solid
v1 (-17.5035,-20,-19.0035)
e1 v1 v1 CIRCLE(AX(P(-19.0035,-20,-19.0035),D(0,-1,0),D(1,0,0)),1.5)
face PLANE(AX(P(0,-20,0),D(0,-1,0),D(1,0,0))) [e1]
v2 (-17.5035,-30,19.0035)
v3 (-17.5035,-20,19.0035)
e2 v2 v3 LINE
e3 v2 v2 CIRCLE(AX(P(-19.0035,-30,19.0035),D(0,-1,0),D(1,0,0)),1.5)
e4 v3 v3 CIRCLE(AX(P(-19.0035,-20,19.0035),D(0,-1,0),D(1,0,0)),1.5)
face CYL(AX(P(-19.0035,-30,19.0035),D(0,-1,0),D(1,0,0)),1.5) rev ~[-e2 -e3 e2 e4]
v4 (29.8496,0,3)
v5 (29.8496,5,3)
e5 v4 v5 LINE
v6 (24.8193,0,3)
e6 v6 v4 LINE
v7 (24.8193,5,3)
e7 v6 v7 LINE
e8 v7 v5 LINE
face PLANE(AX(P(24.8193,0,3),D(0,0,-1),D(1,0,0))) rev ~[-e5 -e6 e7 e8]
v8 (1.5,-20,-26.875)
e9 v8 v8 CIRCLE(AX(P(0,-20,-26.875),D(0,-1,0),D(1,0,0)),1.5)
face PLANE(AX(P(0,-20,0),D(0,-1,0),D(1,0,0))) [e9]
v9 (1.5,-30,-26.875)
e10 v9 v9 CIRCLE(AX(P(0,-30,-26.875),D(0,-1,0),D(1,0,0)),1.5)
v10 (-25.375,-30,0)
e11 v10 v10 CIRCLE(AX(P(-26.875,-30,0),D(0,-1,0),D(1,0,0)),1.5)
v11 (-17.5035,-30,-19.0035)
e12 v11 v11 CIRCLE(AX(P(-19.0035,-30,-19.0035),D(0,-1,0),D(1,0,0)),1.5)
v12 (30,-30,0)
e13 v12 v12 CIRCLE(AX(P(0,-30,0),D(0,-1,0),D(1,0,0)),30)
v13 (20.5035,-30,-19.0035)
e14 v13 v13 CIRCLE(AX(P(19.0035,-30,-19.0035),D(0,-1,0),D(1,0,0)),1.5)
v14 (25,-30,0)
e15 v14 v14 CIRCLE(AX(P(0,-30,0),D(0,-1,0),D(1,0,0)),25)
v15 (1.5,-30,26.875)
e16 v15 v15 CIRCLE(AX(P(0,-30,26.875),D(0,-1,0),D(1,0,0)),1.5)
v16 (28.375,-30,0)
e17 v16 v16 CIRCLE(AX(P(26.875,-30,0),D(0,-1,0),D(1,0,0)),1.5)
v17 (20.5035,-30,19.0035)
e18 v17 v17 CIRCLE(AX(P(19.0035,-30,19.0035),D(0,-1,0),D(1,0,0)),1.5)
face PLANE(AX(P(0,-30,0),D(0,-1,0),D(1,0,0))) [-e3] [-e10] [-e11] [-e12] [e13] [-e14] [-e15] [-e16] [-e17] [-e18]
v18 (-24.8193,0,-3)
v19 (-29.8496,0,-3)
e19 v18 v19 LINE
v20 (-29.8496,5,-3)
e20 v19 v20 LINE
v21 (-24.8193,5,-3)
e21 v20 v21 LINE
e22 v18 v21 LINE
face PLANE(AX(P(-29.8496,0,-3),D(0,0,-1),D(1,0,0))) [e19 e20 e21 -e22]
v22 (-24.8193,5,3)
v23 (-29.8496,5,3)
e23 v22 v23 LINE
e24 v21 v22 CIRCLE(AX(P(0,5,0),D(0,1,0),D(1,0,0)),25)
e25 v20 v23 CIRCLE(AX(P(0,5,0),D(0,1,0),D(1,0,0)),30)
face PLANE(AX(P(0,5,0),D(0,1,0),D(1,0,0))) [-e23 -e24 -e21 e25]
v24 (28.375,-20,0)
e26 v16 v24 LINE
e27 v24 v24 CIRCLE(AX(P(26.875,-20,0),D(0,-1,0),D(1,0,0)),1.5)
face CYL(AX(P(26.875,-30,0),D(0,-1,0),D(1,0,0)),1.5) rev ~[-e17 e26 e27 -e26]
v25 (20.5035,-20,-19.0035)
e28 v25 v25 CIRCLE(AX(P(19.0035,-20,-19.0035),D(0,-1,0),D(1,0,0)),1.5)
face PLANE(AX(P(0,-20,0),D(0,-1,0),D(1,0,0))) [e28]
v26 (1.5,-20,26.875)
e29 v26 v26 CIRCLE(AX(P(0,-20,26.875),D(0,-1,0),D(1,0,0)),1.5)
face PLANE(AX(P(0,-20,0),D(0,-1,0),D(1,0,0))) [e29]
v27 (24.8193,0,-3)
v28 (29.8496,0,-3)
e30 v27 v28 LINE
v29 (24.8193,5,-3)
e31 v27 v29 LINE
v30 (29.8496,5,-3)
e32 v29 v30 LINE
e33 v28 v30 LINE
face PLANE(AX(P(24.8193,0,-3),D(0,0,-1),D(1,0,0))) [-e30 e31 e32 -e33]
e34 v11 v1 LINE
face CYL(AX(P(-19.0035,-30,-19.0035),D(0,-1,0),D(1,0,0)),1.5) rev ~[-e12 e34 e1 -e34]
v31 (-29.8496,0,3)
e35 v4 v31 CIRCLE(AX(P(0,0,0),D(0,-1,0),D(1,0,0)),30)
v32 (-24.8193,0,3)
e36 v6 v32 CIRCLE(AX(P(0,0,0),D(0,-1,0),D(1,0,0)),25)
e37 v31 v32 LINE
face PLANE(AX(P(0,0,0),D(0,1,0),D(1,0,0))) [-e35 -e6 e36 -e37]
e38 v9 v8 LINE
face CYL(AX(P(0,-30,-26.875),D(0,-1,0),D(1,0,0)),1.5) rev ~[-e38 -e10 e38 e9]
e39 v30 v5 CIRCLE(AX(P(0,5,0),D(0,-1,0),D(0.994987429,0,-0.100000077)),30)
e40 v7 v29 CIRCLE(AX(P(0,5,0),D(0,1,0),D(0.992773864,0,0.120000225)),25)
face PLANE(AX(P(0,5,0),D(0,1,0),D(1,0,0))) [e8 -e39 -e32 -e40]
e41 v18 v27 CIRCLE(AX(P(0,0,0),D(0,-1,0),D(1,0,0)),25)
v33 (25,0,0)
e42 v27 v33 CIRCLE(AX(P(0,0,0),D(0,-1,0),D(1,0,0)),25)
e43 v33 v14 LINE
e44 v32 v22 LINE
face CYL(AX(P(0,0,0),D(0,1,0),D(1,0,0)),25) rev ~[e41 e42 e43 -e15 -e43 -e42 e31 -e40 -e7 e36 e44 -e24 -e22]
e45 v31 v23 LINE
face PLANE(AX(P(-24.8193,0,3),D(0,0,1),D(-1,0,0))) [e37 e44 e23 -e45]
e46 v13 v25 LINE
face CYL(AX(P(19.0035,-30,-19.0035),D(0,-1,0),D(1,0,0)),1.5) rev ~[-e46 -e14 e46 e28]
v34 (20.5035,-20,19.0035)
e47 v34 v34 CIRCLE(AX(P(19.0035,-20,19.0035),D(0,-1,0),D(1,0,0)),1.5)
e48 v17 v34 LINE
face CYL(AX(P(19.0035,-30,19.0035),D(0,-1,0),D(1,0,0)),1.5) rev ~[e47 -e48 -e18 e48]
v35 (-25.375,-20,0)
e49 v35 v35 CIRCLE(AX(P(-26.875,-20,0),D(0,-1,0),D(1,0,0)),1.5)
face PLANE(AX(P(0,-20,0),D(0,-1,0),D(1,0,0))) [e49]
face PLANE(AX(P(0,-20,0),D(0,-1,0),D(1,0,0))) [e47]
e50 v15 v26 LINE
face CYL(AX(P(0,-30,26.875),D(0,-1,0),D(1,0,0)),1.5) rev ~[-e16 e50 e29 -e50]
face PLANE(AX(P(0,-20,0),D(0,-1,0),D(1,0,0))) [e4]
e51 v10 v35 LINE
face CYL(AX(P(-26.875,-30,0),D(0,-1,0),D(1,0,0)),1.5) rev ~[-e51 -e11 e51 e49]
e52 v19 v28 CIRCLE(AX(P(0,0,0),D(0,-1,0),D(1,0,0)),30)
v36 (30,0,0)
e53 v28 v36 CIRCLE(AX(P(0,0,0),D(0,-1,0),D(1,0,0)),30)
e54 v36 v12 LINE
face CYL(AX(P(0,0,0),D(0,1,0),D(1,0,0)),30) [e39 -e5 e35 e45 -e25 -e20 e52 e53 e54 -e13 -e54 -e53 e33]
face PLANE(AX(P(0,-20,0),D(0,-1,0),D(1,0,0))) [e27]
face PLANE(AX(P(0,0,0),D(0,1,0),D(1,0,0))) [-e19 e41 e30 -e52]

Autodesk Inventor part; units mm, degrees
ref_plane "YZ Plane" through (0, 0, 0) normal (1, 0, 0) x (0, 1, 0)
ref_plane "XZ Plane" through (0, 0, 0) normal (0, 1, 0) x (-1, 0, 0)
ref_plane "XY Plane" through (0, 0, 0) normal (0, 0, 1) x (1, 0, 0)
sketch "Sketch1" plane through (0, 0, 0) normal (0, 1, 0) x (-1, 0, 0)
  line L0 (0, 0) -> (50, 0) construction
  line L1 (0, 0) -> (50, 0) construction
  line L2 (0, 0) -> (-36, 0)
  circle A0 centre (0, 0) radius 25
  line L3 (-60, -10) -> (-60, 10)
  circle A1 centre (0, 0) radius 61
  point P0 (62.509, -33.0548)
  point P1 (12.6591, 21.558)
  point P2 (24.4148, 5.3777)
  point P3 (24.4148, -5.3777)
  point P4 (-22.9129, 10)
  point P5 (-22.9129, -10)
  point P6 (12.6591, -21.558)
  dimension "d2" = 36
  dimension "d3" = 50
  dimension "d26" = 122
extrude "Extrusion1" add sketch "Sketch1" along normal blind 5 contours A0 | A1
sketch "Sketch2" plane through (0, 5, 0) normal (0, 1, 0) x (1, 0, 0)
  circle A0 centre (0, 0) radius 20
  dimension "d6" = 40
extrude "Extrusion2" cut sketch "Sketch2" against normal up to next
sketch "Sketch3" plane through (0, 5, 0) normal (0, 1, 0) x (1, 0, 0)
  line L0 (22.1416, 4) -> (20.8701, 4)
  line L1 (22.1416, -4) -> (20.8701, -4)
  line L2 (24.6779, 4) -> (22.1416, 4)
  line L3 (24.6779, -4) -> (22.1416, -4)
  line L4 (-15.5618, -16.2506) -> (-14.5332, -15.5032)
  line L5 (-15.5618, 16.2506) -> (-14.5332, 15.5032)
  line L6 (-20.2641, -9.7784) -> (-19.2354, -9.0311)
  line L7 (-17.6137, -17.7414) -> (-15.5618, -16.2506)
  line L8 (-22.316, -11.2693) -> (-20.2641, -9.7784)
  line L9 (-20.2641, 9.7784) -> (-19.2354, 9.0311)
  line L10 (-17.6137, 17.7414) -> (-15.5618, 16.2506)
  line L11 (-22.316, 11.2693) -> (-20.2641, 9.7784)
  line L12 (-23.5374, 22.0452) -> (-13.679, 22.0452) construction
  arc A0 (-17.6137, -17.7414) -> (24.6779, -4) centre (0, 0) ccw
  arc A1 (24.6779, 4) -> (-17.6137, 17.7414) centre (0, 0) ccw
  arc A2 (-22.316, 11.2693) -> (-22.316, -11.2693) centre (0, 0) ccw
  line L13 (20.8701, 4) -> (15.8701, 4)
  line L14 (15.8701, 4) -> (15.8701, -4)
  line L15 (15.8701, -4) -> (20.8701, -4)
  line L16 (-14.5332, 15.5032) -> (-10.4881, 12.5643)
  line L17 (-10.4881, 12.5643) -> (-15.1903, 6.0922)
  line L18 (-15.1903, 6.0922) -> (-19.2354, 9.0311)
  line L19 (-19.2354, -9.0311) -> (-15.1903, -6.0922)
  line L20 (-15.1903, -6.0922) -> (-10.4881, -12.5643)
  line L21 (-10.4881, -12.5643) -> (-14.5332, -15.5032)
  circle A3 centre (-22.5, 0) radius 1.5
  circle A4 centre (0, 22.5) radius 1.5
  circle A5 centre (18.2029, 13.2252) radius 1.5
  circle A6 centre (18.2029, -13.2252) radius 1.5
  circle A7 centre (0, -22.5) radius 1.5
  circle A8 centre (0, 0) radius 4
  line L22 (0, 0) -> (8, 0)
  line L23 (8, 0) -> (8, 7.5)
  line L24 (8, 0) -> (8, -7.5)
  circle A9 centre (8, -7.5) radius 2.5
  circle A10 centre (8, 7.5) radius 2.5
  point P0 (-23.5374, -22.0452)
  point P1 (-28.2397, -15.5731)
  dimension "d9" = 36
  dimension "d10" = 5
  dimension "d11" = 5
  dimension "d12" = 3
  dimension "d13" = 3
  dimension "d14" = 3
  dimension "d15" = 3
  dimension "d16" = 3
  dimension "d17" = 8
  dimension "d18" = 8
  dimension "d19" = 7.5
  dimension "d20" = 7.5
  dimension "d21" = 5
  dimension "d22" = 5
extrude "Extrusion3" cut sketch "Sketch3" against normal up to next contours A3 | A4 | A5 | A6 | A7
sketch "Sketch5" plane through (0, 5, 0) normal (0, 1, 0) x (1, 0, 0)
  line L0 (0, 0) -> (37.5601, 0) construction
  circle A0 centre (0, 0) radius 25
  line L1 (0, 0) -> (15.7675, -27.31)
  line L2 (0, 0) -> (31.5349, 0) construction
  line L3 (0, 0) -> (19.8269, 34.3411)
  line L4 (0, 0) -> (39.6537, 0) construction
  line L5 (12.5, 21.6506) -> (15, 25.9808)
  line L6 (12.5, -21.6506) -> (15, -25.9808)
  line L7 (15, -25.9808) -> (27.9904, -18.4808)
  line L8 (27.9904, -18.4808) -> (34.9904, -30.6051)
  line L9 (34.9904, -30.6051) -> (22, -38.1051)
  line L10 (22, -38.1051) -> (15, -25.9808)
  line L11 (22, -38.1051) -> (15, -25.9808)
  line L12 (15, -25.9808) -> (2.0096, -33.4808)
  line L13 (2.0096, -33.4808) -> (9.0096, -45.6051)
  line L14 (9.0096, -45.6051) -> (22, -38.1051)
  line L15 (15, 25.9808) -> (2.0096, 33.4808)
  line L16 (2.0096, 33.4808) -> (9.0096, 45.6051)
  line L17 (9.0096, 45.6051) -> (22, 38.1051)
  line L18 (22, 38.1051) -> (15, 25.9808)
  line L19 (22, 38.1051) -> (15, 25.9808)
  line L20 (15, 25.9808) -> (27.9904, 18.4808)
  line L21 (27.9904, 18.4808) -> (34.9904, 30.6051)
  line L22 (34.9904, 30.6051) -> (22, 38.1051)
  dimension "d41" = 50
  dimension "d47" = 60
  dimension "d48" = 60
  dimension "d49" = 5
  dimension "d50" = 5
  dimension "d51" = 15
  dimension "d52" = 14
  dimension "d53" = 15
  dimension "d54" = 15
  dimension "d55" = 14
  dimension "d56" = 15
extrude "Extrusion5" cut sketch "Sketch5" against normal up to next contours L7 L8 L9 L10 L1 | L1 L10 L14 L13 L12 | L15 L16 L17 L18 L3 | L3 L18 L22 L21 L20
sketch "Sketch6" plane through (0, 0, 0) normal (0, -1, 0) x (1, 0, 0)
  circle A0 centre (0, 0) radius 25
  circle A1 centre (0, 0) radius 28.75
  circle A2 centre (0, 0) radius 30
  dimension "d57" = 50
  dimension "d58" = 57.5
extrude "Extrusion6" add sketch "Sketch6" along normal blind 30 contours A1 | A2
sketch "Sketch7" plane through (0, -30, 0) normal (0, -1, 0) x (1, 0, 0)
  circle A0 centre (26.875, 0) radius 1.5
  circle A1 centre (0, -26.875) radius 1.5
  circle A2 centre (-26.875, 0) radius 1.5
  circle A3 centre (0, 26.875) radius 1.5
  circle A4 centre (19.0035, 19.0035) radius 1.5
  circle A5 centre (19.0035, -19.0035) radius 1.5
  circle A6 centre (-19.0035, -19.0035) radius 1.5
  circle A7 centre (-19.0035, 19.0035) radius 1.5
  dimension "d62" = 3
  dimension "d63" = 3
  dimension "d64" = 3
  dimension "d65" = 3
  dimension "d67" = 3
  dimension "d68" = 3
  dimension "d69" = 3
  dimension "d70" = 3
extrude "Extrusion7" cut sketch "Sketch7" against normal blind 10
sketch "Sketch8" plane through (0, 0, 0) normal (0, -1, 0) x (1, 0, 0)
  line L0 (-37.9479, -22.6265) -> (-41.4746, -17.7724)
  line L1 (-47.9467, -22.4747) -> (-44.42, -27.3288)
  line L2 (-31.2231, -27.6292) -> (-27.6611, -32.4577)
  circle A0 centre (-42.9473, -22.5506) radius 1.5
  circle A1 centre (-26.2405, -27.6816) radius 1.5
  line L3 (-29.7189, 33.9527) -> (-36.191, 38.655)
  line L4 (-39.7177, 33.8009) -> (-33.2456, 29.0986)
  line L5 (-29.4532, 16.4547) -> (-35.9253, 21.157)
  line L6 (41.5, 10) -> (33.5, 10)
  line L7 (33.5, 4) -> (41.5, 4)
  line L8 (44, -10) -> (52, -10)
  circle A2 centre (48, -7) radius 1.5
  circle A3 centre (37.5, 7) radius 1.5
  circle A4 centre (-34.7183, 33.8768) radius 1.5
  circle A5 centre (-34.4526, 16.3788) radius 1.5
  point P0 (0, 0)
  point P1 (0, 0)
  point P2 (-32.9799, 11.6006)
  point P3 (44, -4)
  dimension "d73" = 3
  dimension "d74" = 3
  dimension "d75" = 3
  dimension "d76" = 3
  dimension "d77" = 3
extrude "Extrusion8" cut sketch "Sketch8" against normal blind 5
sketch "Sketch9" plane through (0, 5, 0) normal (0, 1, 0) x (1, 0, 0)
  line L0 (2.0096, -33.4808) -> (27.9904, -18.4808) projected
  line L1 (9.0096, -45.6051) -> (2.0096, -33.4808)
  line L2 (2.0096, -33.4808) -> (-0.5885, -34.9808)
  line L3 (-0.5885, -34.9808) -> (6.4115, -47.1051)
  line L4 (6.4115, -47.1051) -> (9.0096, -45.6051)
  line L5 (2.0096, 33.4808) -> (9.0096, 45.6051) projected
  line L6 (2.0096, 33.4808) -> (9.0096, 45.6051)
  line L7 (9.0096, 45.6051) -> (6.4115, 47.1051)
  line L8 (6.4115, 47.1051) -> (-0.5885, 34.9808)
  line L9 (-0.5885, 34.9808) -> (2.0096, 33.4808)
  point P0 (0, 0)
  dimension "d80" = 3
  dimension "d81" = 3
extrude "Extrusion9" cut sketch "Sketch9" against normal blind 10
sketch "Sketch10" plane through (0, 0, 0) normal (0, -1, 0) x (1, 0, 0)
  line L0 (6.4115, 47.1051) -> (-9.1769, 56.1051)
  line L1 (-9.1769, 56.1051) -> (-16.1769, 43.9808)
  line L2 (-16.1769, 43.9808) -> (-0.5885, 34.9808)
  line L3 (-9.1769, 56.1051) -> (-11.1769, 52.641)
  line L4 (-16.1769, 43.9808) -> (-14.1769, 47.4449)
  line L5 (-0.5885, 34.9808) -> (1.4115, 38.4449)
  line L6 (1.4115, 38.4449) -> (-2.0526, 40.4449)
  line L7 (6.4115, 47.1051) -> (4.4115, 43.641)
  line L8 (-0.5885, 34.9808) -> (6.4115, 47.1051) projected
  line L9 (4.4115, 43.641) -> (0.9474, 45.641)
  line L10 (27.9904, -18.4808) -> (-0.5885, -34.9808) projected
  line L11 (-16.1769, -43.9808) -> (-9.1769, -56.1051)
  line L12 (6.4115, -47.1051) -> (-0.5885, -34.9808)
  line L13 (-16.1769, -43.9808) -> (-14.1769, -47.4449)
  line L14 (-14.1769, -47.4449) -> (-10.7128, -45.4449)
  line L15 (-9.1769, -56.1051) -> (-11.1769, -52.641)
  line L16 (6.4115, -47.1051) -> (4.4115, -43.641)
  line L17 (-0.5885, -34.9808) -> (6.4115, -47.1051) projected
  line L18 (-0.5885, -34.9808) -> (1.4115, -38.4449)
  line L19 (6.4115, 47.1051) -> (3.8135, 48.6051)
  line L20 (3.8135, 48.6051) -> (-3.1865, 36.4808)
  line L21 (3.8135, 48.6051) -> (-2.6817, 52.3551)
  line L22 (1.8135, 45.141) -> (-2.0836, 47.391)
  line L23 (-2.0836, 47.391) -> (-5.0836, 42.1949)
  line L24 (-0.5885, -34.9808) -> (1.4115, -38.4449)
  line L25 (6.4115, -47.1051) -> (4.4115, -43.641)
  circle A0 centre (-5.5836, -41.3288) radius 1.5
  circle A1 centre (-1.5836, -48.257) radius 1.5
  line L26 (-2.0836, 47.391) -> (-1.5836, 48.257)
  line L27 (-5.0836, 42.1949) -> (-5.5836, 41.3288)
  circle A2 centre (-1.5836, 48.257) radius 1.5
  circle A3 centre (-5.5836, 41.3288) radius 1.5
  point P0 (0, 0)
  dimension "d85" = 14
  dimension "d86" = 4
  dimension "d88" = 4
  dimension "d92" = 4
  dimension "d93" = 4
  dimension "d94" = 4
  dimension "d95" = 4
  dimension "d98" = 18
  dimension "d99" = 4
  dimension "d101" = 4
  dimension "d103" = 4
  dimension "d129" = 3
  dimension "d130" = 7.5
  dimension "d137" = 4.5
  dimension "d140" = 4
  dimension "d146" = 3
  dimension "d148" = 1
  dimension "d149" = 1
  dimension "d150" = 3
  dimension "d151" = 3
extrude "Extrusion13" cut sketch "Sketch10" against normal blind 10 contours A2 L23 L22 | L22 L23 A2 | A0 | A1 | A3
sketch "Sketch11" plane through (0, 5, 0) normal (0, 1, 0) x (1, 0, 0)
  circle A0 centre (0, 0) radius 61
extrude "Extrusion14" cut sketch "Sketch11" against normal blind 5
sketch "Sketch12" plane through (0, 0, 0) normal (0, 1, 0) x (1, 0, 0)
  circle A0 centre (0, 0) radius 30
  circle A1 centre (0, 0) radius 30 projected
  circle A2 centre (0, 0) radius 25
  circle A3 centre (0, 0) radius 25 projected
  line L0 (-25, -3) -> (-29.8496, -3)
  line L1 (-24.8193, -3) -> (-25, -3)
  line L2 (-25, 3) -> (-24.8193, 3)
  line L3 (-29.8496, 3) -> (-24.8193, 3)
  line L4 (24.8193, -3) -> (29.8496, -3)
  line L5 (24.8193, 3) -> (29.8496, 3)
extrude "Extrusion15" add sketch "Sketch12" along normal blind 5 contours A0 L4 A2 L5 | L3 L2 A2 L1 L0 A0
properties part number "upperBase1"
